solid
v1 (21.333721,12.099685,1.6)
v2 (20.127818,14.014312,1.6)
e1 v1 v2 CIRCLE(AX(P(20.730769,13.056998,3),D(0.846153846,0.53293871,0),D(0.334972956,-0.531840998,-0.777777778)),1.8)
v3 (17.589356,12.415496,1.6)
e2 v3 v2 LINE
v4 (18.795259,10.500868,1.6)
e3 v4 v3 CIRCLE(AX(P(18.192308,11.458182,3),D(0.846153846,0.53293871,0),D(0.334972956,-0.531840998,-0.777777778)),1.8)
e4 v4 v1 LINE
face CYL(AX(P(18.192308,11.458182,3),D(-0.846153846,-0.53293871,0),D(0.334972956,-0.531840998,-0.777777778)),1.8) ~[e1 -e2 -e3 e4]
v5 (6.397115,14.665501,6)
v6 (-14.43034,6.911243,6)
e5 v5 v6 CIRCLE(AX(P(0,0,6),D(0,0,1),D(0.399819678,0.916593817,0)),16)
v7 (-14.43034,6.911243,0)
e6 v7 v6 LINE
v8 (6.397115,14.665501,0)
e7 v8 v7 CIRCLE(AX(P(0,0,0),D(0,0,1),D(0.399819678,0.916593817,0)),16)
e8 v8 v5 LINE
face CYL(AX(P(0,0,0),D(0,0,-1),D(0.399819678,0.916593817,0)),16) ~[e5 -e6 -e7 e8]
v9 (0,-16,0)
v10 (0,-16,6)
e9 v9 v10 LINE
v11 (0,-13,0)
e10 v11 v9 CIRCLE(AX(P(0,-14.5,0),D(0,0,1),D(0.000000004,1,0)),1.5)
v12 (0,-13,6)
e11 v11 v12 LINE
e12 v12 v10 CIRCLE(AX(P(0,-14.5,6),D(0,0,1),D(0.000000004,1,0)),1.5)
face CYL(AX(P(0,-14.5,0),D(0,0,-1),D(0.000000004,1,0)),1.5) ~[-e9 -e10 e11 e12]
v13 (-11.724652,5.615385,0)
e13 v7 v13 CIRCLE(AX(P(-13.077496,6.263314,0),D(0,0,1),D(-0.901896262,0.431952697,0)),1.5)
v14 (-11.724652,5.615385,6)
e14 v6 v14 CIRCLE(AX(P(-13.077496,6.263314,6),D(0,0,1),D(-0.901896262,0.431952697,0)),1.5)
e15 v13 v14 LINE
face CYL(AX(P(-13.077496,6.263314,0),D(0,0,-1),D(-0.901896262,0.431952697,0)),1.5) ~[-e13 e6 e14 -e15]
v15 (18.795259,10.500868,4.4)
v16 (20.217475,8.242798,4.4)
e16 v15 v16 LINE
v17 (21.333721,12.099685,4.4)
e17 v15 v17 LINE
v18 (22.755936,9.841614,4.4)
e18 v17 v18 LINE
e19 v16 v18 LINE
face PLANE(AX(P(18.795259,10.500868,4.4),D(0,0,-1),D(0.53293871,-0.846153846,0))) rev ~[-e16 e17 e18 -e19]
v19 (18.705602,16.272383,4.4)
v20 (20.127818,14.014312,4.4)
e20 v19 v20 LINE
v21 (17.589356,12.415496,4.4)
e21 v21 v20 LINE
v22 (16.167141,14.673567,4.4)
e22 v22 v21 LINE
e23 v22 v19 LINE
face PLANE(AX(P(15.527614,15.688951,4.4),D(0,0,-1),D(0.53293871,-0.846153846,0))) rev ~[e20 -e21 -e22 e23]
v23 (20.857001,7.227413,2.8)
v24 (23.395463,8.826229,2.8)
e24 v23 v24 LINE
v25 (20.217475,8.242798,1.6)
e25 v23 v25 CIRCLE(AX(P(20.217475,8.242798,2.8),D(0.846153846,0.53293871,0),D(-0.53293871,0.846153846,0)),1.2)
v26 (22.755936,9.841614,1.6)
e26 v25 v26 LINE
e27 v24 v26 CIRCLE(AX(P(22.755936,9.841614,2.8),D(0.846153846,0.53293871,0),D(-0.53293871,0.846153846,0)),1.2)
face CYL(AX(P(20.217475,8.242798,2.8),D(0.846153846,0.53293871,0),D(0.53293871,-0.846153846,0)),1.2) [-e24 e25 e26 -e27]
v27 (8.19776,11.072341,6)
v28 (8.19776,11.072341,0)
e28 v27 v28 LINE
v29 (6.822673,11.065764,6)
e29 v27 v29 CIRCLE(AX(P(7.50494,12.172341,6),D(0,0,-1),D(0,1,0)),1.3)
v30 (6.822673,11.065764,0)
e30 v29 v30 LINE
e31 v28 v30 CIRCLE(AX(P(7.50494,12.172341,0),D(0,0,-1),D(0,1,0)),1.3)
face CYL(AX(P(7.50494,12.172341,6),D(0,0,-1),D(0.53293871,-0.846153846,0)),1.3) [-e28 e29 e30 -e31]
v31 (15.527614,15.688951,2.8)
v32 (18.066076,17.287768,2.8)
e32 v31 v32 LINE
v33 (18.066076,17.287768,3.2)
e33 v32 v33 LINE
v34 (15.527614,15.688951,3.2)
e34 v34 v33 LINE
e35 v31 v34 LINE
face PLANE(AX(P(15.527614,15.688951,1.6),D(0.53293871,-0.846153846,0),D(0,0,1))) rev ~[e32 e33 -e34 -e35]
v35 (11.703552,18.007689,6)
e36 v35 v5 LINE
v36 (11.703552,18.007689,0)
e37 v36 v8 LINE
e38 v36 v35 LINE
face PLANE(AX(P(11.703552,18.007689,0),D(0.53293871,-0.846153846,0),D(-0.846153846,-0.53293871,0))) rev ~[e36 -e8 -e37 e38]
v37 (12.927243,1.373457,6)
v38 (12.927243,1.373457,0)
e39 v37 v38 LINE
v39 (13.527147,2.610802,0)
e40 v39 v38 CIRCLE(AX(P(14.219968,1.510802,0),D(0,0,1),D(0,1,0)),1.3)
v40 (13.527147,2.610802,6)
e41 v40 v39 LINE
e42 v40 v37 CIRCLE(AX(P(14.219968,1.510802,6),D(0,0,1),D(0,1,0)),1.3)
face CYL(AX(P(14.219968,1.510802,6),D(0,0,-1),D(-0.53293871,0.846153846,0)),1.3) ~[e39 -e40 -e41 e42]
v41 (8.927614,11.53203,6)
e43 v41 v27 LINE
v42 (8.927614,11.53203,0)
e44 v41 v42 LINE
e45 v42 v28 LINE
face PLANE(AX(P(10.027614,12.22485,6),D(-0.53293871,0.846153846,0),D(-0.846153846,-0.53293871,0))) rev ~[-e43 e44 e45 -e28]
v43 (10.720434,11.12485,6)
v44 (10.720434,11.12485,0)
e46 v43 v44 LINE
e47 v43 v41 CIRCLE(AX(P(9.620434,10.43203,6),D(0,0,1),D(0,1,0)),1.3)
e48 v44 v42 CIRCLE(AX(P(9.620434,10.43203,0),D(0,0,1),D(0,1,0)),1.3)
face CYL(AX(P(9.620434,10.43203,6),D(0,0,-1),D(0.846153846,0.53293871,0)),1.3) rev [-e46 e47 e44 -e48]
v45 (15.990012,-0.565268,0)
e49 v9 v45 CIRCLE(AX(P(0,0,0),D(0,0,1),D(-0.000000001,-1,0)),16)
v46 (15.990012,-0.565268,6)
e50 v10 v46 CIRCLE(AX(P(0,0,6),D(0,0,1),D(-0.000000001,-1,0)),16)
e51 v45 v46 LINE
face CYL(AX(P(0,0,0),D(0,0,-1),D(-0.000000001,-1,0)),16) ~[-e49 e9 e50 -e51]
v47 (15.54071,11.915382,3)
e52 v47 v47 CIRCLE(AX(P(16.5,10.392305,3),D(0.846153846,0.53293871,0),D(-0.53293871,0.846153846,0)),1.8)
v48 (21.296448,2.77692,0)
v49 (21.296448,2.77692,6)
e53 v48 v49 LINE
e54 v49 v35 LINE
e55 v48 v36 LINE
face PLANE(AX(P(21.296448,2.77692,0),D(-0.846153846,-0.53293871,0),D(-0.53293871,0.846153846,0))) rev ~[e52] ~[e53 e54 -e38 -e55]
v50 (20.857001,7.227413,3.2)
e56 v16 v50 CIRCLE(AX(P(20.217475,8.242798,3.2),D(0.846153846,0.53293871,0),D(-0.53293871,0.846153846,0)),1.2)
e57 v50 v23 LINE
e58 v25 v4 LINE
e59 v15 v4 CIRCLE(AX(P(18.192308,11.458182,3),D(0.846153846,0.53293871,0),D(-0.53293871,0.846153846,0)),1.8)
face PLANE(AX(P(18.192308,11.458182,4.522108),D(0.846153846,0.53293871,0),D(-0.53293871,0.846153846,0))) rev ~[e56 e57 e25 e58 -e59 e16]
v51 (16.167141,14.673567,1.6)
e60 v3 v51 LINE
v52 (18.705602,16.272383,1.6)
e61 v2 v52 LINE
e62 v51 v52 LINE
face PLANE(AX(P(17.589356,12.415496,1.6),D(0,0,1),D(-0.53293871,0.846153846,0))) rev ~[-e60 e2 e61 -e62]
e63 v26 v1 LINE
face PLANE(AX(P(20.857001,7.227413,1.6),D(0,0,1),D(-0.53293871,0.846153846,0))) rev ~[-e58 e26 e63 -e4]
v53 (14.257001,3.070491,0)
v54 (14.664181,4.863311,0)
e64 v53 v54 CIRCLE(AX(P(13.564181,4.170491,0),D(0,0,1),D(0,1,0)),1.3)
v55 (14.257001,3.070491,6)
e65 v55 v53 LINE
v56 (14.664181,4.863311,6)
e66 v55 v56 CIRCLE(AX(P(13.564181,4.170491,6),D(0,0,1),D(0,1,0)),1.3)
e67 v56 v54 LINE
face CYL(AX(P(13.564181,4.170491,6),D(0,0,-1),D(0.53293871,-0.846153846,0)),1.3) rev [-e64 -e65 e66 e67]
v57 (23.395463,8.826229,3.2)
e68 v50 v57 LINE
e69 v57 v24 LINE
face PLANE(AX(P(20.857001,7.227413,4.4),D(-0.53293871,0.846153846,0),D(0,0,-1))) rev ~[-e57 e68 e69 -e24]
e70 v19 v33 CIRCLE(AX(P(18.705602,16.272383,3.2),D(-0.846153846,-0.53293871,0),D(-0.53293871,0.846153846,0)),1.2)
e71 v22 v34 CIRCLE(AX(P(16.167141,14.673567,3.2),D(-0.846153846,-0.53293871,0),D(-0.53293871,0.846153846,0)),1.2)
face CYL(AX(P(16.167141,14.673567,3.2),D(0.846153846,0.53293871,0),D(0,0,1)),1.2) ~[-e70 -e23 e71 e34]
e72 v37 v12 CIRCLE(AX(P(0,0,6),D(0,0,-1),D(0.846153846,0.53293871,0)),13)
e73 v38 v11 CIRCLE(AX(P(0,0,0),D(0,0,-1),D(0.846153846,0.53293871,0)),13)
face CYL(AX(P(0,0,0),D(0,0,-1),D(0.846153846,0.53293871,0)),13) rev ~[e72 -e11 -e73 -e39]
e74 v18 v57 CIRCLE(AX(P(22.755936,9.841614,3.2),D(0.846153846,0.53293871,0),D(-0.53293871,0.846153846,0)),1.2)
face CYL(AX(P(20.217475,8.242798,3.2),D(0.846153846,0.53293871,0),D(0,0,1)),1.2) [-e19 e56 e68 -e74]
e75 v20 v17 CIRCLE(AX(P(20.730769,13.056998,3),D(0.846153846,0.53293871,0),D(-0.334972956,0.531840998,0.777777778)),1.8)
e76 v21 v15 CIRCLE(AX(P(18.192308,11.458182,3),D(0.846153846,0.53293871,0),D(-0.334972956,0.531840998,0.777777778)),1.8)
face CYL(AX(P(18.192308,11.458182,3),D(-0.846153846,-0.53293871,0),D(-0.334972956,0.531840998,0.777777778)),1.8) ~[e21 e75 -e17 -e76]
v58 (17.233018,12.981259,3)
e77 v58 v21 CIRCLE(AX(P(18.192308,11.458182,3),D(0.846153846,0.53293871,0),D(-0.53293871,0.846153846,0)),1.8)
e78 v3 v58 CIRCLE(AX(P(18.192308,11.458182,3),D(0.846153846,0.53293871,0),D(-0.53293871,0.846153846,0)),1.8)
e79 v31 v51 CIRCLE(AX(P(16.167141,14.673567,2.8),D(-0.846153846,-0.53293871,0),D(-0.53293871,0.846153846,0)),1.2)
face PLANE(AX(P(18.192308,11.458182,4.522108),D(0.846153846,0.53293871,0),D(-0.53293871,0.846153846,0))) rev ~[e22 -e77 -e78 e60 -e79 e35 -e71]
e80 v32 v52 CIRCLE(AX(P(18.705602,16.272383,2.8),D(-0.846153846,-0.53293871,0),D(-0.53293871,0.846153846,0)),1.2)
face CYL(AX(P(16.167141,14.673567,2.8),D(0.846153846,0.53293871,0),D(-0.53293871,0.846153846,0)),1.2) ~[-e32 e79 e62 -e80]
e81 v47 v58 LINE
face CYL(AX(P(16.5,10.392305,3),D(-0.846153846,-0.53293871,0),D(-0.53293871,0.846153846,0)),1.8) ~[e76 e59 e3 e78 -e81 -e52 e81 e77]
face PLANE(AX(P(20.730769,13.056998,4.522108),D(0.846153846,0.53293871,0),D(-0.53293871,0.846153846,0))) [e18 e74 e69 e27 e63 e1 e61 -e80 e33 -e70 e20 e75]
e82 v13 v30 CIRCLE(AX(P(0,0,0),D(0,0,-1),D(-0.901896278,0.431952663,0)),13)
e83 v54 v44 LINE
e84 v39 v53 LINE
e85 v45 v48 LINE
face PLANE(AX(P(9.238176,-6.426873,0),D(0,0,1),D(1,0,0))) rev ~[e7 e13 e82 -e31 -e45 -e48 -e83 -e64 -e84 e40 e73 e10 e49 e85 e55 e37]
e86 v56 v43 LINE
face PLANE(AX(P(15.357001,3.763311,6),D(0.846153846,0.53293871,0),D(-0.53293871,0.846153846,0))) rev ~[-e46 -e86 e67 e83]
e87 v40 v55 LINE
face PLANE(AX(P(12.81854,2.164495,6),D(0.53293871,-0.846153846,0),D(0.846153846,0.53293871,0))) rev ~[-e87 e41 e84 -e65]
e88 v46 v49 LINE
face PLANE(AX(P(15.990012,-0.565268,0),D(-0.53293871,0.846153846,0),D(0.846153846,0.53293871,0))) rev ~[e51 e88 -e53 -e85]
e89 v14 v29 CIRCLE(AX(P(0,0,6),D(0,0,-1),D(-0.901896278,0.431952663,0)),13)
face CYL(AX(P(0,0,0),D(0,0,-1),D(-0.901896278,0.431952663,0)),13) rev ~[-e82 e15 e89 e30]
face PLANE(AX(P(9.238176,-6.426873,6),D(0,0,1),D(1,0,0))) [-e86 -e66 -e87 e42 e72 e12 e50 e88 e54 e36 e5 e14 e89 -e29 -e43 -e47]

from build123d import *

# Parameters (mm, degrees)
F1_DEPTH = 6
F2_R     = 1.8
F3_DEPTH = 2
F5_DEPTH = 3
F6_R     = 1.2
F8_DEPTH = 6.1
F9_R     = 1.3


# Not quite as in the source:
# - a feature names something its author has since deleted; it is built from what else it names


with BuildPart() as f1:
    # F0 (on Top) → F1 (new body)
    with BuildSketch(Plane.XY):
        with BuildLine():
            ThreePointArc((11, 6.9282032303), (11.3812706231, -6.2822511095), (0, -13))
            ThreePointArc((0, -13), (-1.5000000067, -14.4999999933), (-1.34e-08, -16))
            ThreePointArc((-1.34e-08, -16), (11.1120589721, -11.5118263277), (15.9900116293, -0.5652681616))
            Line((15.9900116293, -0.5652681616), (15.7964483902, -0.6871813851))
            Line((15.7964483902, -0.6871813851), (11, 6.9282032303))
        make_face()
        with BuildLine():
            ThreePointArc((-11.7246516205, 5.6153846154), (-0.7497687455, 12.9783607142), (11, 6.9282032303))
            Line((11, 6.9282032303), (6.2035516098, 14.5435878457))
            Line((6.2035516098, 14.5435878457), (6.3971148489, 14.6655010692))
            ThreePointArc((6.3971148489, 14.6655010692), (-5.582589802, 14.9944886909), (-14.4303404061, 6.9112427076))
            ThreePointArc((-14.4303404061, 6.9112427076), (-13.7254250594, 4.9104692687), (-11.7246516205, 5.6153846154))
        make_face()
        with BuildLine():
            Line((6.2035516098, 14.5435878457), (11, 6.9282032303))
            Line((11, 6.9282032303), (15.7964483902, -0.6871813851))
            Line((15.7964483902, -0.6871813851), (15.9900116293, -0.5652681616))
            ThreePointArc((15.9900116293, -0.5652681616), (13.5384615385, 8.5270193603), (6.3971148489, 14.6655010692))
            Line((6.3971148489, 14.6655010692), (6.2035516098, 14.5435878457))
        make_face()
        with BuildLine():
            ThreePointArc((6.3971148489, 14.6655010692), (13.5384615385, 8.5270193603), (15.9900116293, -0.5652681616))
            Line((15.9900116293, -0.5652681616), (21.2964483902, 2.77692023))
            Line((21.2964483902, 2.77692023), (11.7035516098, 18.0076894608))
            Line((11.7035516098, 18.0076894608), (6.3971148489, 14.6655010692))
        make_face()
    extrude(amount=F1_DEPTH)

    # F2 (on face) → F3 (join)
    with BuildSketch(Plane(origin=(16.5, 10.3923048454, 0), x_dir=(-0.53293871, 0.8461538462, 0), z_dir=(0.8461538462, 0.53293871, 0))):
        with Locations((0, 3)):
            Circle(F2_R)
    extrude(amount=F3_DEPTH)

    # F4 (on face) → F5 (join)
    with BuildSketch(Plane(origin=(18.1923076923, 11.4581822655, 0), x_dir=(-0.53293871, 0.8461538462, 0), z_dir=(0.8461538462, 0.53293871, 0))):
        with BuildLine():
            Line((-1.1313708499, 4.4), (1.1313708499, 4.4))
            ThreePointArc((1.1313708499, 4.4), (0, 4.8), (-1.1313708499, 4.4))
        make_face()
        with BuildLine():
            Line((-1.1313708499, 1.6), (1.1313708499, 1.6))
            ThreePointArc((1.1313708499, 1.6), (1.6242640687, 2.2242640687), (1.8, 3))
            ThreePointArc((1.8, 3), (1.6242640687, 3.7757359313), (1.1313708499, 4.4))
            Line((1.1313708499, 4.4), (-1.1313708499, 4.4))
            ThreePointArc((-1.1313708499, 4.4), (-1.8, 3), (-1.1313708499, 1.6))
        make_face()
        with BuildLine():
            Line((1.1313708499, 1.6), (5, 1.6))
            Line((5, 1.6), (5, 4.4))
            Line((5, 4.4), (1.1313708499, 4.4))
            ThreePointArc((1.1313708499, 4.4), (1.6242640687, 3.7757359313), (1.8, 3))
            ThreePointArc((1.8, 3), (1.6242640687, 2.2242640687), (1.1313708499, 1.6))
        make_face()
        with BuildLine():
            Line((-5, 1.6), (-1.1313708499, 1.6))
            ThreePointArc((-1.1313708499, 1.6), (-1.8, 3), (-1.1313708499, 4.4))
            Line((-1.1313708499, 4.4), (-5, 4.4))
            Line((-5, 4.4), (-5, 1.6))
        make_face()
        with BuildLine():
            ThreePointArc((-1.1313708499, 1.6), (0, 1.2), (1.1313708499, 1.6))
            Line((1.1313708499, 1.6), (-1.1313708499, 1.6))
        make_face()
    extrude(amount=F5_DEPTH)

    # F6
    f6_edges = [f1.edges().sort_by_distance(p)[0] for p in [
        (22.126232, 8.026821, 4.4),
        (22.126232, 8.026821, 1.6),
        (16.796845, 16.48836, 4.4),
        (16.796845, 16.48836, 1.6),
    ]]
    fillet(f6_edges, radius=F6_R)

    # F7 (on face) → F8 (cut)
    with BuildSketch(Plane.XY.offset(6)):
        with BuildLine():
            ThreePointArc((7.4891526037, 10.626033751), (9.4276549916, 8.9509396914), (11, 6.9282032303))
            Line((11, 6.9282032303), (12.6923076923, 7.9940806503))
            Line((12.6923076923, 7.9940806503), (10.0276141422, 12.2248498811))
            Line((10.0276141422, 12.2248498811), (7.4891526037, 10.626033751))
        make_face()
        with BuildLine():
            Line((12.6923076923, 7.9940806503), (11, 6.9282032303))
            ThreePointArc((11, 6.9282032303), (12.1451198736, 4.6363847183), (12.818539704, 2.1644952895))
            Line((12.818539704, 2.1644952895), (15.3570012424, 3.7633114195))
            Line((15.3570012424, 3.7633114195), (12.6923076923, 7.9940806503))
        make_face()
    extrude(amount=-F8_DEPTH, mode=Mode.SUBTRACT)

    # F9
    f9_edges = [f1.edges().sort_by_distance(p)[0] for p in [
        (7.489153, 10.626034, 3),
        (10.027614, 12.22485, 3),
        (12.81854, 2.164495, 3),
        (15.357001, 3.763311, 3),
    ]]
    fillet(f9_edges, radius=F9_R)


solid = f1.part
